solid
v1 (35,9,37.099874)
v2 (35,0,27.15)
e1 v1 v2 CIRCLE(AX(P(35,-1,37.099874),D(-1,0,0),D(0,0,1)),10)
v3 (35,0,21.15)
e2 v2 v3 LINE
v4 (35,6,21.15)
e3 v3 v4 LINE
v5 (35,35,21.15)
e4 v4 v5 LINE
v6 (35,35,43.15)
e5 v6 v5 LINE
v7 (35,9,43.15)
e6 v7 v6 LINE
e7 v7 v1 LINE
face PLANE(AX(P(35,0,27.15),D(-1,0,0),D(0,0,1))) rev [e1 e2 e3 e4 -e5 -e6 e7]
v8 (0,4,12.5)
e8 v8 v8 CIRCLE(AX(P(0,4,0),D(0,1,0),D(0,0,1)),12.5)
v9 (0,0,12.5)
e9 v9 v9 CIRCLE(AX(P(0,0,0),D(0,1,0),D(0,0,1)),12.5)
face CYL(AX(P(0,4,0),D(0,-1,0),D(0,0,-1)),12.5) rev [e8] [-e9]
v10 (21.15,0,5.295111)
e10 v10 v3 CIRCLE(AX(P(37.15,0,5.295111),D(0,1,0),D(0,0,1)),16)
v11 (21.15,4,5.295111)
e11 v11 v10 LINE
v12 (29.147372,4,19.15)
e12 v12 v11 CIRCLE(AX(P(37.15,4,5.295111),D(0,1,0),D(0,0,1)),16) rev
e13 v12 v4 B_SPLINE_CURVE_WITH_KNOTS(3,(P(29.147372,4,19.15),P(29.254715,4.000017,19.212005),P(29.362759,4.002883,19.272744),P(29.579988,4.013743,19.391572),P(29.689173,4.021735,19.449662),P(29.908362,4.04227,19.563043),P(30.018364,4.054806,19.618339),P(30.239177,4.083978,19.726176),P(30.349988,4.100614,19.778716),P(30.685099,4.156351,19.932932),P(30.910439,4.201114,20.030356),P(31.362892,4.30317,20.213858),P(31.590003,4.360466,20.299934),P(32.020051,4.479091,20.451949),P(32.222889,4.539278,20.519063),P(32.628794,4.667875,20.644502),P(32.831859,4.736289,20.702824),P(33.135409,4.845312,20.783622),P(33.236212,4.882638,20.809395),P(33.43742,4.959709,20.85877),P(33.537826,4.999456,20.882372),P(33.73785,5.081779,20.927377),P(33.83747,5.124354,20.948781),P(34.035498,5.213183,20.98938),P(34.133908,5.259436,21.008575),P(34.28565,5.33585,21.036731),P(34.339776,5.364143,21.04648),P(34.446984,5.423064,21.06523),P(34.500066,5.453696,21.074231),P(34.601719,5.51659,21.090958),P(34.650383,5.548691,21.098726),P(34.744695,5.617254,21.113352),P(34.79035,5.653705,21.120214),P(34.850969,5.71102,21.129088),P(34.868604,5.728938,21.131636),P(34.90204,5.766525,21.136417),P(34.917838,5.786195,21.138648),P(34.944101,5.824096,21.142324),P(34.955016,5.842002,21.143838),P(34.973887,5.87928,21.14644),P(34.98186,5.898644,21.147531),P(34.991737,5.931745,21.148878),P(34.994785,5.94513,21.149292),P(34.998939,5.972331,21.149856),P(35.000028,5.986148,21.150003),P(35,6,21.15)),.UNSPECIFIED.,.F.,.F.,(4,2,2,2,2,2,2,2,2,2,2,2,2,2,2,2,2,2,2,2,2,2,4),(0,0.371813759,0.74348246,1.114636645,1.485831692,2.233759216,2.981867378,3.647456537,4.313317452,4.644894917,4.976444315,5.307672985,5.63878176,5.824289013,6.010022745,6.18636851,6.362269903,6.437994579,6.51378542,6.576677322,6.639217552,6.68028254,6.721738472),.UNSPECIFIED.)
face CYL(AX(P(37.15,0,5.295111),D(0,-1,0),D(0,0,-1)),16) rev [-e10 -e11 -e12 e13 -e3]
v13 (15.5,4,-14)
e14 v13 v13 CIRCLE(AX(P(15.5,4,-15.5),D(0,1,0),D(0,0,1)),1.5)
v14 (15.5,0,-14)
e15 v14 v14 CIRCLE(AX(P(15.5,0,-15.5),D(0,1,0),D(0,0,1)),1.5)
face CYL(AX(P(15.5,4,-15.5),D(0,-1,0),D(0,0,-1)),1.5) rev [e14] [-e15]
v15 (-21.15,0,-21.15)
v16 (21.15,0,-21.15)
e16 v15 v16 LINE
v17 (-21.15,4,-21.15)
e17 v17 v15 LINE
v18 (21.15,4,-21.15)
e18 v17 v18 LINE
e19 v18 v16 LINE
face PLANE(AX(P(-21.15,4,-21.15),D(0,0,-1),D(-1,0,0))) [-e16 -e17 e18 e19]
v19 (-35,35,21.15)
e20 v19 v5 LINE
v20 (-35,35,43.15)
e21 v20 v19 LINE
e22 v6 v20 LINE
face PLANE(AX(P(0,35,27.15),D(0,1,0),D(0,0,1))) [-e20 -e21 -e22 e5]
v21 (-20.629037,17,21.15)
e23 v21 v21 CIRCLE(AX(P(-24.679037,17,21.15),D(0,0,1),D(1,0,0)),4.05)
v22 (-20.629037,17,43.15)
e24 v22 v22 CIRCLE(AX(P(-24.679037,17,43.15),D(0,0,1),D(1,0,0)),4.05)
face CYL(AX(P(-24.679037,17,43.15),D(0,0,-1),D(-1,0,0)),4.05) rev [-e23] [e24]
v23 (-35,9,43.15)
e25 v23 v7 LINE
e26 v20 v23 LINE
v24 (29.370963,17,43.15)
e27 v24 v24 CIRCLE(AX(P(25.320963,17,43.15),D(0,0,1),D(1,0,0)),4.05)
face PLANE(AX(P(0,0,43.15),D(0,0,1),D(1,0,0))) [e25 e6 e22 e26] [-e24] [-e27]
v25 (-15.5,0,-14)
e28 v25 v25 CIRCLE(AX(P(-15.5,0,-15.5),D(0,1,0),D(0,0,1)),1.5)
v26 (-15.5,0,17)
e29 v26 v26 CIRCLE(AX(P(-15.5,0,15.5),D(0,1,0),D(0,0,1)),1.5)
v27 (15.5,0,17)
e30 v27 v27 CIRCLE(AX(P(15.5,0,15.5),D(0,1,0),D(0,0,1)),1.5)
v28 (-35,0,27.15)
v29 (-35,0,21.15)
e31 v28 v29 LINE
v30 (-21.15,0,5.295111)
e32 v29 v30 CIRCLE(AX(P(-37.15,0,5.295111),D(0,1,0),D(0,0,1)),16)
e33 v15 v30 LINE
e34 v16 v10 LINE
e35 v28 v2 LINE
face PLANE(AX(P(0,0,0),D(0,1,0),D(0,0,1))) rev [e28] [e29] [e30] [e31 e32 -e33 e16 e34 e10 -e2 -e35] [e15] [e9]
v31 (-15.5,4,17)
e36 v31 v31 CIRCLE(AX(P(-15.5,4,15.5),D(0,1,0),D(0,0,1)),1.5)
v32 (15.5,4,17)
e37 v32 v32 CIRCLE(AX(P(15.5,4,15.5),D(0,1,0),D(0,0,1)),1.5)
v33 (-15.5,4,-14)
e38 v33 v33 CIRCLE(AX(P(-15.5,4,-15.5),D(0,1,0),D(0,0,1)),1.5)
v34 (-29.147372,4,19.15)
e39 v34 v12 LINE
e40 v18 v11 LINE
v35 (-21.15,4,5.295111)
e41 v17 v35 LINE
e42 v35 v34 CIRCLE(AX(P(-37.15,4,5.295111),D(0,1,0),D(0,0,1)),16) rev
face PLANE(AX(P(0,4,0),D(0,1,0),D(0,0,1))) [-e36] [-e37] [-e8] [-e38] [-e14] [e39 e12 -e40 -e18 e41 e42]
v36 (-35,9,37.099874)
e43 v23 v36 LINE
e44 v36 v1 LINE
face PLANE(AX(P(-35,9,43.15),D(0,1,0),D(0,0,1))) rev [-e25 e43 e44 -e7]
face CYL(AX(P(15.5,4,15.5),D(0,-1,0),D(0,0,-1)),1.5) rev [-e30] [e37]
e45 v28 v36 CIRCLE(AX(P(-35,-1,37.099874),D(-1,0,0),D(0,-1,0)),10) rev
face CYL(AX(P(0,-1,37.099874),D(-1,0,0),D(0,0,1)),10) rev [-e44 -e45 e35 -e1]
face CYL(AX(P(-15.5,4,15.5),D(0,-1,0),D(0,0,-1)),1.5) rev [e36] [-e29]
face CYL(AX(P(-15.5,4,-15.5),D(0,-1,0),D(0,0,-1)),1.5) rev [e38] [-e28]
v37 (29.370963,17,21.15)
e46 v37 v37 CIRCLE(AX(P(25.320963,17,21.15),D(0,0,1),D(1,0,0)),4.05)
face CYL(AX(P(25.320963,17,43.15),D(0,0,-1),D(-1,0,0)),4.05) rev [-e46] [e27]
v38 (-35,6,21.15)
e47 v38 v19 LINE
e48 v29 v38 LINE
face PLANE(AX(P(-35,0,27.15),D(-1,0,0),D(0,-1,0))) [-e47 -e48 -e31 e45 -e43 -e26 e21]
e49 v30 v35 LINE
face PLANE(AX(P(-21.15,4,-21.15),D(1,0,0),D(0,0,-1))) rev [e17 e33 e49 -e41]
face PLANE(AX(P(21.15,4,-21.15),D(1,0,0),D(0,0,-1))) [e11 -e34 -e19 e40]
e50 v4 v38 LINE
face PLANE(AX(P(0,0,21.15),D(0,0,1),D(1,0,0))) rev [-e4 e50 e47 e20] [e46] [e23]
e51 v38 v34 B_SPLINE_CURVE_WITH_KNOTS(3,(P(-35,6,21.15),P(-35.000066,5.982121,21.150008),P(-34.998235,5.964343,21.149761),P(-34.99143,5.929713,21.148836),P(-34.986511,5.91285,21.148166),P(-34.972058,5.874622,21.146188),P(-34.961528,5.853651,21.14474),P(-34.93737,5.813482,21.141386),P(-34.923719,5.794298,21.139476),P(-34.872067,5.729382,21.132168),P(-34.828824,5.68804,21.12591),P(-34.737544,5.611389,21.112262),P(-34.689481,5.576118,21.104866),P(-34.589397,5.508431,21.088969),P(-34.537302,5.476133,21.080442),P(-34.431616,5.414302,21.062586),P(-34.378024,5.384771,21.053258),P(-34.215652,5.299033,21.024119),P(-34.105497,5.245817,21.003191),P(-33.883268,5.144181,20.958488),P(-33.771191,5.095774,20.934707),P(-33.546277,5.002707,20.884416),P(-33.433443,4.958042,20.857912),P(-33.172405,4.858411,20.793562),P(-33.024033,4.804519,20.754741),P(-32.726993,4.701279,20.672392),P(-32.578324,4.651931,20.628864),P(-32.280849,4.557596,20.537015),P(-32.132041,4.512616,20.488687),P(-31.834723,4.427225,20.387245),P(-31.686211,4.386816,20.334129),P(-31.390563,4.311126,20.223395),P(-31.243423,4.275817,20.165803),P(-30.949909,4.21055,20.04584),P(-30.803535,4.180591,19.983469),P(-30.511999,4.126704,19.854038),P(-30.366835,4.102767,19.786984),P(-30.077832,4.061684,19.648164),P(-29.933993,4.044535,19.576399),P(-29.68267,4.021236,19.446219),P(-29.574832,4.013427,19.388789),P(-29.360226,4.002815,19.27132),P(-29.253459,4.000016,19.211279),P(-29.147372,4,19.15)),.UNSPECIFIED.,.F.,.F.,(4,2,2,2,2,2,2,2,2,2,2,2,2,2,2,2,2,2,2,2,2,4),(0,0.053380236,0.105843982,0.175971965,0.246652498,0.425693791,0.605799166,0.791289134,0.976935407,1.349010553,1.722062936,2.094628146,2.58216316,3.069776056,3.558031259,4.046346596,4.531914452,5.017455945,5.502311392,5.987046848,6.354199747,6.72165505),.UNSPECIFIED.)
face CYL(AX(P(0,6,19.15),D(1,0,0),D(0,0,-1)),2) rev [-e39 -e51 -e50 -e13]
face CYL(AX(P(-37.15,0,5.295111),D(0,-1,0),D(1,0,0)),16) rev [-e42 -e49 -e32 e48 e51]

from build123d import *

# Parameters (mm, degrees)
SKETCH1_W           = 42.3
SKETCH1_H           = 42.3
SKETCH1_R           = 1.5
SKETCH1_R_2         = 12.5
BOSS_EXTRUDE1_DEPTH = 4
SKETCH2_W           = 70
SKETCH2_H           = 35
BOSS_EXTRUDE3_DEPTH = 6
SKETCH5_W           = 70
SKETCH5_H           = 26
SKETCH5_R           = 4.05
BOSS_EXTRUDE7_DEPTH = 16
CUT_EXTRUDE1_START  = -16
SKETCH5_2_R         = 4.05
CUT_EXTRUDE1_DEPTH  = 16
FILLET1_R           = 16
FILLET2_R           = 10
FILLET4_R           = 2


with BuildPart() as part:
    # Sketch1 → Boss-Extrude1 (new body)
    with BuildSketch(Plane(origin=(0, 0, 0), x_dir=(1, 0, 0), z_dir=(0, 1, 0))):
        Rectangle(SKETCH1_W, SKETCH1_H)
        with Locations(Location((-15.5, 15.5, 0), (0, 0, 270))):
            Circle(SKETCH1_R, mode=Mode.SUBTRACT)
        with Locations(Location((15.5, 15.5, 0), (0, 0, 270))):
            Circle(SKETCH1_R, mode=Mode.SUBTRACT)
        with Locations(Location((15.5, -15.5, 0), (0, 0, 270))):
            Circle(SKETCH1_R, mode=Mode.SUBTRACT)
        with Locations(Location((-15.5, -15.5, 0), (0, 0, 270))):
            Circle(SKETCH1_R, mode=Mode.SUBTRACT)
        with Locations(Location((0, 0, 0), (0, 0, 270))):
            Circle(SKETCH1_R_2, mode=Mode.SUBTRACT)
    extrude(amount=BOSS_EXTRUDE1_DEPTH)

    # Sketch2 → Boss-Extrude3 (add)
    with BuildSketch(Plane.XY.offset(21.15)):
        with Locations((0, 17.5)):
            Rectangle(SKETCH2_W, SKETCH2_H)
    extrude(amount=BOSS_EXTRUDE3_DEPTH)

    # Sketch5 → Boss-Extrude7 (add)
    with BuildSketch(Plane.XY.offset(27.15)):
        with Locations((0, 22)):
            Rectangle(SKETCH5_W, SKETCH5_H)
        with Locations((-24.679036529, 17)):
            Circle(SKETCH5_R, mode=Mode.SUBTRACT)
        with Locations((25.320963471, 17)):
            Circle(SKETCH5_R, mode=Mode.SUBTRACT)
    extrude(amount=BOSS_EXTRUDE7_DEPTH)

    # Sketch5<2> → Cut-Extrude1 (cut)
    with BuildSketch(Plane.XY.offset(27.15).offset(CUT_EXTRUDE1_START)):
        with Locations((-24.679036529, 17)):
            Circle(SKETCH5_2_R)
        with Locations((25.320963471, 17)):
            Circle(SKETCH5_2_R)
    extrude(amount=CUT_EXTRUDE1_DEPTH, mode=Mode.SUBTRACT)

    # Fillet1
    # the kernel refuses this fillet: 16 mm, written as the material it adds along each edge
    with BuildSketch(Plane(origin=(21.15, 0, 21.15), x_dir=(1, 0, 0), z_dir=(0, 1, 0))) as fillet1_piece_1:
        with BuildLine():
            CenterArc((16, 15.854888836), FILLET1_R, 180, 82.27751927)
            Line((0, 15.854888836), (-0.32, 15.854888836))
            Line((-0.32, 15.854888836), (-0.32, 0))
            Line((-0.32, 0), (0, -0.32))
            ThreePointArc((0, -0.32), (6.925, -0.32), (13.807, -0.317097777))
            Line((13.807, -0.317097777), (13.85, 0))
        make_face()
    extrude(amount=4)
    with BuildSketch(Plane(origin=(-21.15, 0, 21.15), x_dir=(-1, 0, 0), z_dir=(0, 1, 0))) as fillet1_piece_2:
        with BuildLine():
            CenterArc((16, -15.854888836), FILLET1_R, 97.72248073, 82.27751927)
            Line((0, -15.854888836), (-0.32, -15.854888836))
            Line((-0.32, -15.854888836), (-0.32, 0))
            Line((-0.32, 0), (0, 0.32))
            ThreePointArc((0, 0.32), (6.925, 0.32), (13.807, 0.317097777))
            Line((13.807, 0.317097777), (13.85, 0))
        make_face()
    extrude(amount=4)

    # Fillet2
    # the kernel refuses this fillet: 10 mm, written as the material it adds along each edge
    with BuildSketch(Plane(origin=(35, 9, 27.15), x_dir=(0, 0, 1), z_dir=(-1, 0, 0))) as fillet2_piece_1:
        with BuildLine():
            CenterArc((9.949874371, -10), FILLET2_R, 90, 84.260829523)
            Line((0, -9), (-0.198997487, -8.98))
            ThreePointArc((-0.198997487, -8.98), (-0.2, -4.5), (-0.2, 0))
            Line((-0.2, 0), (0, 0.2))
            Line((0, 0.2), (9.949874371, 0.2))
            Line((9.949874371, 0.2), (9.949874371, 0))
        make_face()
    extrude(amount=70)

    # Fillet4
    # the kernel refuses this fillet: 2 mm, written as the material it adds along each edge
    with BuildSketch(Plane(origin=(-35, 4, 21.15), x_dir=(0, 1, 0), z_dir=(1, 0, 0))) as fillet4_piece_1_section:
        with BuildLine():
            CenterArc((FILLET4_R, -FILLET4_R), FILLET4_R, 90, 90)
            Line((0, -FILLET4_R), (0, 0))
            Line((0, 0), (FILLET4_R, 0))
        make_face()
    fillet4_piece_1 = extrude(amount=70, mode=Mode.PRIVATE)
    fillet4_piece_1 = fillet4_piece_1 - Plane(origin=(-37.15, 4.464640399, 5.295111164), x_dir=(-1, 0, 0), z_dir=(0, -1, 0)) * Cylinder(16, 148, mode=Mode.PRIVATE)
    fillet4_piece_1 = fillet4_piece_1 - Plane(origin=(37.15, 4.464640399, 5.295111164), x_dir=(1, 0, 0), z_dir=(0, -1, 0)) * Cylinder(16, 148, mode=Mode.PRIVATE)
    add(fillet4_piece_1)


solid = part.part
